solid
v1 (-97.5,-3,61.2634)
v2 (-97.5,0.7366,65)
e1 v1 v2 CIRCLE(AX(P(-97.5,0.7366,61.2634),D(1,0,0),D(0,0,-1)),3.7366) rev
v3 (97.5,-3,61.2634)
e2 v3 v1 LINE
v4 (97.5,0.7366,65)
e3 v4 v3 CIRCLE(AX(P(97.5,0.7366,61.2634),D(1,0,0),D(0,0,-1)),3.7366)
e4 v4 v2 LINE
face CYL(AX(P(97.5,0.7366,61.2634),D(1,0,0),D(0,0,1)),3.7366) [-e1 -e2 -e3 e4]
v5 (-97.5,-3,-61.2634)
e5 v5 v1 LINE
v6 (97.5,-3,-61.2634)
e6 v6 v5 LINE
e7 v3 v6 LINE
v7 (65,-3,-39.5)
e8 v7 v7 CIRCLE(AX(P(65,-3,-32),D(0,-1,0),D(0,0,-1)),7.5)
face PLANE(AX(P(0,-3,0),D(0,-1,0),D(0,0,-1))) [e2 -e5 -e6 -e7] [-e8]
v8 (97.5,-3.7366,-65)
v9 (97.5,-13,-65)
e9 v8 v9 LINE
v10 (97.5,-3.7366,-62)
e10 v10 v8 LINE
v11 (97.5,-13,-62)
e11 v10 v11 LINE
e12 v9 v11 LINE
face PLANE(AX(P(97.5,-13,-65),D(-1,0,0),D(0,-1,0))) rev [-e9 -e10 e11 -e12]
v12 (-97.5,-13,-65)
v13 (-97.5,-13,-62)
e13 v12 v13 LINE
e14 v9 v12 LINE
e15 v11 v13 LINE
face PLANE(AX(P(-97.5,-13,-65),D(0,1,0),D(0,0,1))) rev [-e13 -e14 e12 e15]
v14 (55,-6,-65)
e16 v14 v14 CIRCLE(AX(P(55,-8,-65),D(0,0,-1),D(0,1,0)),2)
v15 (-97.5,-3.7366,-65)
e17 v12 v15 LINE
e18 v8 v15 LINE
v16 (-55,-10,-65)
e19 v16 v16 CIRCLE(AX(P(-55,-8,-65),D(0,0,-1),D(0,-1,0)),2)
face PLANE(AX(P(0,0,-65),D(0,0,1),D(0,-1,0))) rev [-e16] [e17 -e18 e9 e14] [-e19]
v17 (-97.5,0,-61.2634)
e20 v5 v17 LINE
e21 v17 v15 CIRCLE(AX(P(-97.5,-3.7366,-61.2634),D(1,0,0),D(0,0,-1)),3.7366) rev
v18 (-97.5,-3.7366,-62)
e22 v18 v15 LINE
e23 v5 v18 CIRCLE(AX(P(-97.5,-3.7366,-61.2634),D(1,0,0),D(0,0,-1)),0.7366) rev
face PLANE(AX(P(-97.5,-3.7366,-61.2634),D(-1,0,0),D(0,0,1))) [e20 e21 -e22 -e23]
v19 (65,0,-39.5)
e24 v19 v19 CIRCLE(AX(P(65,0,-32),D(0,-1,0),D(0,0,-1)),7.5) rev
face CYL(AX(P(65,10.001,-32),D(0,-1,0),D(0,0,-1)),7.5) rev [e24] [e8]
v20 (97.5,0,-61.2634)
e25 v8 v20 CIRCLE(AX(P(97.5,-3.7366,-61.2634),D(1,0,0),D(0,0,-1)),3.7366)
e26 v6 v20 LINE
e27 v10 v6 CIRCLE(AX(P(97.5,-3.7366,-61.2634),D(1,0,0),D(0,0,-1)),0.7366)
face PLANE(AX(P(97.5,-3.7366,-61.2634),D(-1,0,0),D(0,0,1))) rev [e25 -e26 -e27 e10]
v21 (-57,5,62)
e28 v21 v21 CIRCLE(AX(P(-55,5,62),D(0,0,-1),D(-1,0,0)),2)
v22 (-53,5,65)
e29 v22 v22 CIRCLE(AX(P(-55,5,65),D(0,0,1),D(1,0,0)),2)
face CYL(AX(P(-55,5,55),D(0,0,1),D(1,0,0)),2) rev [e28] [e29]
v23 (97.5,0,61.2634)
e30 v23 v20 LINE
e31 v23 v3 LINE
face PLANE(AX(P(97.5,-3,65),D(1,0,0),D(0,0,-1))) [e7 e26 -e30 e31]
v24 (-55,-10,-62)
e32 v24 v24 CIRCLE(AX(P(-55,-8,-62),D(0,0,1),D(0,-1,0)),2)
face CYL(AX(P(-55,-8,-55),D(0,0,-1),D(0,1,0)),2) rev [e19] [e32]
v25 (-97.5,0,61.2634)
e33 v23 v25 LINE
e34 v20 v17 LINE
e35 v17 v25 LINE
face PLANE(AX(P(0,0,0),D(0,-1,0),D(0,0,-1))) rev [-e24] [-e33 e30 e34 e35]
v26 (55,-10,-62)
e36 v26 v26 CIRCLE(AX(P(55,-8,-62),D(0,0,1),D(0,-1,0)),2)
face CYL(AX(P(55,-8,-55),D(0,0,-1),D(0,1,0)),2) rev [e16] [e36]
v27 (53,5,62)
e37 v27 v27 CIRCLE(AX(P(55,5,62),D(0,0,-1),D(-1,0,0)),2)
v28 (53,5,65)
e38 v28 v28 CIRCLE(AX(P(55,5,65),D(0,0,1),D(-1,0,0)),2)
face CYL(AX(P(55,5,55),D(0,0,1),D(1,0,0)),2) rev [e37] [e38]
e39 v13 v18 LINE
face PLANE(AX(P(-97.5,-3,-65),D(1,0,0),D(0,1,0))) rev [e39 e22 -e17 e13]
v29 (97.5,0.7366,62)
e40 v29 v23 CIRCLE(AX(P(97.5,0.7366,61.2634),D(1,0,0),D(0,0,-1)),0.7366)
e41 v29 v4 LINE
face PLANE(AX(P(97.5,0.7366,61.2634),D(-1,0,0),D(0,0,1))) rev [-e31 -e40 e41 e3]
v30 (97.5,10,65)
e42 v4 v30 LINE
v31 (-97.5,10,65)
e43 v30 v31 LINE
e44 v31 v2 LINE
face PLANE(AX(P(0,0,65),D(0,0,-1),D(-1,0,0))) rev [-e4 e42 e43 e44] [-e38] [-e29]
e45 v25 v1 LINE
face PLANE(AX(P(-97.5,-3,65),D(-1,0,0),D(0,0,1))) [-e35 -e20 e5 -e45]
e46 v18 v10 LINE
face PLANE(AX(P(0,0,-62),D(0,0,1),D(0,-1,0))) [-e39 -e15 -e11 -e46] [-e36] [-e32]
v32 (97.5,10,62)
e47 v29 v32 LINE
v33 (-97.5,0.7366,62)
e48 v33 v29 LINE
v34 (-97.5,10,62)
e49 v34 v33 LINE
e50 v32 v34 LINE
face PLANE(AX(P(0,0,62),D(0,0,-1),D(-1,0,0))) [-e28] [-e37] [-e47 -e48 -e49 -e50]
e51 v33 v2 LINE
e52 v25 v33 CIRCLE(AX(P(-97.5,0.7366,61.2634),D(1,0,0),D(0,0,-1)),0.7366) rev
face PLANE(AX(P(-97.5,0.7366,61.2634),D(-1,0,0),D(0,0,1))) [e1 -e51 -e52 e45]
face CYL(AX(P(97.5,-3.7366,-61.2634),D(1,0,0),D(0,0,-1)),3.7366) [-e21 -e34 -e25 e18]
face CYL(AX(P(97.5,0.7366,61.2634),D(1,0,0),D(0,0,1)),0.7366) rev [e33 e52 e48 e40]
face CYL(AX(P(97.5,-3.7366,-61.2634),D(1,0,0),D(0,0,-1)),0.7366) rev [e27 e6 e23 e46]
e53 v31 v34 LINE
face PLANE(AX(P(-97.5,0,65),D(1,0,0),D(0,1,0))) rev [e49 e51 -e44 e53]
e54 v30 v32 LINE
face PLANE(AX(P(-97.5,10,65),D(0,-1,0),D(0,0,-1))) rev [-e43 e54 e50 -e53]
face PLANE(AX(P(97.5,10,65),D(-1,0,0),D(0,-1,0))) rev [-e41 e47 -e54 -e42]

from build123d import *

# Parameters (mm, degrees)
SKETCH_1_W                       = 195
SKETCH_1_H                       = 130
SM_BASE_FLANGE_1_DEPTH           = 3
SM_EDGE_FLANGE_1_STRIP_W         = 13.4732
SM_EDGE_FLANGE_1_STRIP_H         = 3
SM_EDGE_FLANGE_1_STRIP_CUT_DEPTH = 195
SM_EDGE_FLANGE_1_DEPTH           = 195
SM_EDGE_FLANGE_2_STRIP_W         = 13.4732
SM_EDGE_FLANGE_2_STRIP_H         = 3
SM_EDGE_FLANGE_2_STRIP_CUT_DEPTH = 195
SM_EDGE_FLANGE_2_DEPTH           = 195
SKETCH_12_R                      = 2
CUT_EXTRUDE_1_DEPTH              = 10
SKETCH_13_R                      = 2
CUT_EXTRUDE_2_DEPTH              = 10
CUT_EXTRUDE_3_REACH              = 119.899
SKETCH_14_R                      = 7.5


# Sheet-metal steps are written as plain solids
with BuildPart() as part:
    # Sketch 1 → 基体-法兰1 (new body)
    with BuildSketch(Plane(origin=(0, 0, 0), x_dir=(1, 0, 0), z_dir=(0, 1, 0))):
        Rectangle(SKETCH_1_W, SKETCH_1_H)
    extrude(amount=-SM_BASE_FLANGE_1_DEPTH)

    # 边线-法兰1 strip (across the edge) → 边线-法兰1 strip cut (cut)
    with BuildSketch(Plane(origin=(-97.5, 0, 65), x_dir=(0, 0, -1), z_dir=(1, 0, 0))):
        with Locations((-3, -1.5)):
            Rectangle(SM_EDGE_FLANGE_1_STRIP_W, SM_EDGE_FLANGE_1_STRIP_H)
    extrude(amount=SM_EDGE_FLANGE_1_STRIP_CUT_DEPTH, mode=Mode.SUBTRACT)

    # 边线-法兰1 section (across the edge) → 边线-法兰1 (add)
    with BuildSketch(Plane(origin=(-97.5, 0, 65), x_dir=(0, 0, -1), z_dir=(1, 0, 0))):
        with BuildLine():
            Line((0, 0.7366), (0, 10))
            Line((0, 10), (3, 10))
            Line((3, 10), (3, 0.7366))
            ThreePointArc((3, 0.7366), (3.215745145, 0.215745145), (3.7366, 0))
            Line((3.7366, 0), (3.7366, -3))
            ThreePointArc((3.7366, -3), (1.094424801, -1.905575199), (0, 0.7366))
        make_face()
    extrude(amount=SM_EDGE_FLANGE_1_DEPTH)

    # 边线-法兰2 strip (across the edge) → 边线-法兰2 strip cut (cut)
    with BuildSketch(Plane(origin=(-97.5, -3, -65), x_dir=(0, 0, 1), z_dir=(1, 0, 0))):
        with Locations((-3, -1.5)):
            Rectangle(SM_EDGE_FLANGE_2_STRIP_W, SM_EDGE_FLANGE_2_STRIP_H)
    extrude(amount=SM_EDGE_FLANGE_2_STRIP_CUT_DEPTH, mode=Mode.SUBTRACT)

    # 边线-法兰2 section (across the edge) → 边线-法兰2 (add)
    with BuildSketch(Plane(origin=(-97.5, -3, -65), x_dir=(0, 0, 1), z_dir=(1, 0, 0))):
        with BuildLine():
            Line((0, 0.7366), (0, 10))
            Line((0, 10), (3, 10))
            Line((3, 10), (3, 0.7366))
            ThreePointArc((3, 0.7366), (3.215745145, 0.215745145), (3.7366, 0))
            Line((3.7366, 0), (3.7366, -3))
            ThreePointArc((3.7366, -3), (1.094424801, -1.905575199), (0, 0.7366))
        make_face()
    extrude(amount=SM_EDGE_FLANGE_2_DEPTH)

    # 草图12 → 切除-拉伸1 (cut)
    with BuildSketch(Plane.XY.offset(65)):
        with Locations((-55, 5)):
            Circle(SKETCH_12_R)
        with Locations(Location((55, 5, 0), (0, 0, 180))):
            Circle(SKETCH_12_R)
    extrude(amount=-CUT_EXTRUDE_1_DEPTH, mode=Mode.SUBTRACT)

    # 草图13 → 切除-拉伸2 (cut)
    with BuildSketch(Plane(origin=(0, 0, -65), x_dir=(-1, 0, 0), z_dir=(0, 0, -1))):
        with Locations(Location((-55, -8, 0), (0, 0, 90))):
            Circle(SKETCH_13_R)
        with Locations(Location((55, -8, 0), (0, 0, 270))):
            Circle(SKETCH_13_R)
    extrude(amount=-CUT_EXTRUDE_2_DEPTH, mode=Mode.SUBTRACT)

    # 草图14 → 切除-拉伸3 (cut, up to next)
    with BuildSketch(Plane.XZ.offset(3), mode=Mode.PRIVATE) as cut_extrude_3_sk1:
        with Locations(Location((65, -32, 0), (0, 0, 270))):
            Circle(SKETCH_14_R)
    cut_extrude_3_tool1 = extrude(cut_extrude_3_sk1.sketch, amount=-CUT_EXTRUDE_3_REACH, mode=Mode.PRIVATE) & part.part
    add(cut_extrude_3_tool1.solids().sort_by_distance((65, -3, -32))[0], mode=Mode.SUBTRACT)


solid = part.part
